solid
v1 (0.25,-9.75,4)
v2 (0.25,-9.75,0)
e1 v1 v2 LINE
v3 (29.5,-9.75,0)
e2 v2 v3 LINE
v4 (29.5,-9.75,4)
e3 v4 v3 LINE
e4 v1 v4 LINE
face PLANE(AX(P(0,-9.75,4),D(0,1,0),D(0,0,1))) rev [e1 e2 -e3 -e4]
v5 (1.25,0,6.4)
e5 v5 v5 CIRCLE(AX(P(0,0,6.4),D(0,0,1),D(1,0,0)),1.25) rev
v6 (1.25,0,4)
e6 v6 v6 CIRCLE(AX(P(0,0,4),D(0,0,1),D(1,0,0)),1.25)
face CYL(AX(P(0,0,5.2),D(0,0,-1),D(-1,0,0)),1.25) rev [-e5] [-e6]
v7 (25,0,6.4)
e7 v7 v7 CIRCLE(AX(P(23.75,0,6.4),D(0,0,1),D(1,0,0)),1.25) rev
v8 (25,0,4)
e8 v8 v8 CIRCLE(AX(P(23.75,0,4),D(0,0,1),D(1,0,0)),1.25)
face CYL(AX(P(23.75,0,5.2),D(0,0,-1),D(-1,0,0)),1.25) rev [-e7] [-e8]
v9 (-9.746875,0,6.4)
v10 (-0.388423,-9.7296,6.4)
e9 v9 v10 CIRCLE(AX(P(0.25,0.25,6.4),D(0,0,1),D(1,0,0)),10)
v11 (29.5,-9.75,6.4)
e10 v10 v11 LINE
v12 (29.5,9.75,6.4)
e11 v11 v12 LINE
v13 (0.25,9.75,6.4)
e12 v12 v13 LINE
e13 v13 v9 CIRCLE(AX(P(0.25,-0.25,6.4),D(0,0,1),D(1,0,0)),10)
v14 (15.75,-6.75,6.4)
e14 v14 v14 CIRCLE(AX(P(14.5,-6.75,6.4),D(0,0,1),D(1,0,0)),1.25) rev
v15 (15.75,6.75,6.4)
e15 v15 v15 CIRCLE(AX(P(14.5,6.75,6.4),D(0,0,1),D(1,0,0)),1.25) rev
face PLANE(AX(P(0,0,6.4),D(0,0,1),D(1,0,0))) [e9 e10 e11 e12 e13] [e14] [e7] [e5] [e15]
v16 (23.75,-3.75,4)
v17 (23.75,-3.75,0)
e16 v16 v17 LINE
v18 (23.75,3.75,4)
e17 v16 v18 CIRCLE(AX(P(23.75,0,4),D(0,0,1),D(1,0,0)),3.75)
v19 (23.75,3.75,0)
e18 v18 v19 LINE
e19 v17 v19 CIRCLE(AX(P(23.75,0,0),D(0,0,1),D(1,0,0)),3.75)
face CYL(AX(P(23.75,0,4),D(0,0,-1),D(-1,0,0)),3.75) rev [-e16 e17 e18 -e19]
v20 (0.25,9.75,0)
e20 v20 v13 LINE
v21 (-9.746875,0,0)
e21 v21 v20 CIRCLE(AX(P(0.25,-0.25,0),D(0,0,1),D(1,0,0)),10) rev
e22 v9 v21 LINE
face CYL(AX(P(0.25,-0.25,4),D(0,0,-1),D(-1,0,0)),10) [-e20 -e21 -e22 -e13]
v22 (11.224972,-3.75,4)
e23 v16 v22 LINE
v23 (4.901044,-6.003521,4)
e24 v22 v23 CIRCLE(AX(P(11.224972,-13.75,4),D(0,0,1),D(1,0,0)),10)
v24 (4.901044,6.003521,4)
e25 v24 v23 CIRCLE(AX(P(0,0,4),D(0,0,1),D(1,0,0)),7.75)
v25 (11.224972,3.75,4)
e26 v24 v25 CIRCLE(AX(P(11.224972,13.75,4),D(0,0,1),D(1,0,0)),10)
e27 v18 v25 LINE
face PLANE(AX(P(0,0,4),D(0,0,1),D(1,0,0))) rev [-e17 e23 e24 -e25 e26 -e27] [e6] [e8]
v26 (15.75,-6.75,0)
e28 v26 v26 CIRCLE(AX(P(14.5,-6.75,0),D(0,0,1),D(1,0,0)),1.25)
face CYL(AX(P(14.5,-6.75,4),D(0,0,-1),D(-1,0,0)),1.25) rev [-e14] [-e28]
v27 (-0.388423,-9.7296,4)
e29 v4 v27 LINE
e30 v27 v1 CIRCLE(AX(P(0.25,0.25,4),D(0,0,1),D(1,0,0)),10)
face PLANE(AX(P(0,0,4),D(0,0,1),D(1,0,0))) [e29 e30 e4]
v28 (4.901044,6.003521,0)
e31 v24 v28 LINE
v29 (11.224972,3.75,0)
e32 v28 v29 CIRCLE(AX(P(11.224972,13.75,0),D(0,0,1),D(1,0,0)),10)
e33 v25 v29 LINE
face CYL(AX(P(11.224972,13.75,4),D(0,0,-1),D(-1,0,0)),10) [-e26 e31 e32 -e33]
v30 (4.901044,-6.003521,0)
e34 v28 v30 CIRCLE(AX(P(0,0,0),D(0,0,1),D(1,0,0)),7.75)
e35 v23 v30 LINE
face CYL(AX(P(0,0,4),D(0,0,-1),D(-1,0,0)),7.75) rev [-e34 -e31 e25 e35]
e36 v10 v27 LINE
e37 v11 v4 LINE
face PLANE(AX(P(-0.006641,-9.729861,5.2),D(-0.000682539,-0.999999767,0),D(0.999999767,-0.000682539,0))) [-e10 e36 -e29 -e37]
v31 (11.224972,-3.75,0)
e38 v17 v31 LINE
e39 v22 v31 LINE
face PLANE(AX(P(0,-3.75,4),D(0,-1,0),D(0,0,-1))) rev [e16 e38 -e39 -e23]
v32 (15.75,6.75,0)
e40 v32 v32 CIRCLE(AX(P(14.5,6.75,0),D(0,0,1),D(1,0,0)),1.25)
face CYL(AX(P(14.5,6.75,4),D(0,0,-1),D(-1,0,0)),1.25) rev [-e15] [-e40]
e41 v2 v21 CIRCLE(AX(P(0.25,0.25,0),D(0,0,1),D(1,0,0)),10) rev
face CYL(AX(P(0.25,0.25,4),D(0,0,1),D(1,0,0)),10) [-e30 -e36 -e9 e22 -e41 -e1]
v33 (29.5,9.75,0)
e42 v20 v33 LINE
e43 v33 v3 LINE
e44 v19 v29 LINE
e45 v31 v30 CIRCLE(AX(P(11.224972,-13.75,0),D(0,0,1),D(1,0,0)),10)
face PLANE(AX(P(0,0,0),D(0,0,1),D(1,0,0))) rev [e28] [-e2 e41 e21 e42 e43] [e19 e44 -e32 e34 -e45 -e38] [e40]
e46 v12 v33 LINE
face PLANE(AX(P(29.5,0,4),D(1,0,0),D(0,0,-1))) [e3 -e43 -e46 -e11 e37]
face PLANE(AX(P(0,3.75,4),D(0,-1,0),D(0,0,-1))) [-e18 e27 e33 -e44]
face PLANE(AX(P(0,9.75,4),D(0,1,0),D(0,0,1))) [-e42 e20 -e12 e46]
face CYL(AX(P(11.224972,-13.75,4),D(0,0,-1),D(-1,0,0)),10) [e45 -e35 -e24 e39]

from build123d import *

# Parameters (mm, degrees)
SKETCH1_R           = 1.25
BOSS_EXTRUDE4_DEPTH = 4
FILLET1_R           = 10
SKETCH2_R           = 1.25
BOSS_EXTRUDE5_DEPTH = 1.2
SKETCH3_R           = 1.25
BOSS_EXTRUDE6_DEPTH = 1.2


with BuildPart() as part:
    # Sketch1 → Boss-Extrude4 (new body)
    with BuildSketch(Plane.XY):
        Polygon((-9.75, 9.75), (-9.75, 0), (-9.75, -9.75), (29.5, -9.75), (29.5, -6.75), (29.5, 6.75), (29.5, 9.75), align=None)
        with Locations((14.5, -6.75)):
            Circle(SKETCH1_R, mode=Mode.SUBTRACT)
        with BuildLine():
            ThreePointArc((4.901044183, -6.003521127), (-3.322604971, -7.001628111), (-7.75, 0))
            ThreePointArc((-7.75, 0), (-3.322604971, 7.001628111), (4.901044183, 6.003521127))
            ThreePointArc((4.901044183, 6.003521127), (7.868246727, 4.330212616), (11.22497216, 3.75))
            Line((11.22497216, 3.75), (23.75, 3.75))
            ThreePointArc((23.75, 3.75), (26.401650429, 2.651650429), (27.5, 0))
            ThreePointArc((27.5, 0), (26.401650429, -2.651650429), (23.75, -3.75))
            Line((23.75, -3.75), (11.22497216, -3.75))
            ThreePointArc((11.22497216, -3.75), (7.868246727, -4.330212616), (4.901044183, -6.003521127))
        make_face(mode=Mode.SUBTRACT)
        with Locations((14.5, 6.75)):
            Circle(SKETCH1_R, mode=Mode.SUBTRACT)
    extrude(amount=BOSS_EXTRUDE4_DEPTH)

    # Fillet1
    # the kernel refuses this fillet: 10 mm, written as the material it takes off along each edge
    with BuildSketch(Plane(origin=(-9.75, -9.75, -25), x_dir=(0, 1, 0), z_dir=(0, 0, 1))) as fillet1_piece_1:
        with BuildLine():
            CenterArc((FILLET1_R, -FILLET1_R), FILLET1_R, 90, 90)
            Line((0, -FILLET1_R), (0, 0))
            Line((0, 0), (FILLET1_R, 0))
        make_face()
    extrude(amount=54, mode=Mode.SUBTRACT)
    with BuildSketch(Plane(origin=(-9.75, 9.75, -25), x_dir=(0, -1, 0), z_dir=(0, 0, 1))) as fillet1_piece_2:
        with BuildLine():
            CenterArc((FILLET1_R, FILLET1_R), FILLET1_R, 180, 90)
            Line((0, FILLET1_R), (0, 0))
            Line((0, 0), (FILLET1_R, 0))
        make_face()
    extrude(amount=54, mode=Mode.SUBTRACT)

    # Sketch2 → Boss-Extrude5 (add)
    # profile 1 of 4: a face of its own
    with BuildSketch(Plane.XY.offset(4)):
        with BuildLine():
            ThreePointArc((8.882472313, 4.028236041), (5.388428188, 8.129565896), (0.25, 9.75))
            ThreePointArc((0.25, 9.75), (-6.732120022, 6.908910532), (-9.746874512, 0))
            ThreePointArc((-9.746874512, 0), (-6.957195545, -6.682267477), (-0.388423062, -9.729599992))
            Line((-0.388423062, -9.729599992), (0.667724562, -9.730320853))
            ThreePointArc((0.667724562, -9.730320853), (5.561475334, -8.012177738), (8.882472313, -4.028236041))
            ThreePointArc((8.882472313, -4.028236041), (6.780629621, -4.791885277), (4.901044183, -6.003521127))
            ThreePointArc((4.901044183, -6.003521127), (-7.75, 0), (4.901044183, 6.003521127))
            ThreePointArc((4.901044183, 6.003521127), (6.780629621, 4.791885277), (8.882472313, 4.028236041))
        make_face()
    # profile 2 of 4: a face of its own
    with BuildSketch(Plane.XY.offset(4)):
        with BuildLine():
            ThreePointArc((9.753204602, 0), (9.5330365, 2.060634631), (8.882472313, 4.028236041))
            ThreePointArc((8.882472313, 4.028236041), (6.780629621, 4.791885277), (4.901044183, 6.003521127))
            ThreePointArc((4.901044183, 6.003521127), (-7.75, 0), (4.901044183, -6.003521127))
            ThreePointArc((4.901044183, -6.003521127), (6.780629621, -4.791885277), (8.882472313, -4.028236041))
            ThreePointArc((8.882472313, -4.028236041), (9.5330365, -2.060634631), (9.753204602, 0))
        make_face()
        Circle(SKETCH2_R, mode=Mode.SUBTRACT)
    # profile 3 of 4: a face of its own
    with BuildSketch(Plane.XY.offset(4)):
        with BuildLine():
            Line((29.5, -9.75), (29.5, 9.75))
            Line((29.5, 9.75), (0.25, 9.75))
            ThreePointArc((0.25, 9.75), (5.388428188, 8.129565896), (8.882472313, 4.028236041))
            ThreePointArc((8.882472313, 4.028236041), (10.045489135, 3.819802631), (11.22497216, 3.75))
            Line((11.22497216, 3.75), (23.75, 3.75))
            ThreePointArc((23.75, 3.75), (27.5, 0), (23.75, -3.75))
            Line((23.75, -3.75), (11.22497216, -3.75))
            ThreePointArc((11.22497216, -3.75), (10.045489135, -3.819802631), (8.882472313, -4.028236041))
            ThreePointArc((8.882472313, -4.028236041), (5.561475334, -8.012177738), (0.667724562, -9.730320853))
            Line((0.667724562, -9.730320853), (29.5, -9.75))
        make_face()
        with Locations((14.5, -6.75)):
            Circle(SKETCH2_R, mode=Mode.SUBTRACT)
        with Locations((14.5, 6.75)):
            Circle(SKETCH2_R, mode=Mode.SUBTRACT)
    # profile 4 of 4: a face of its own
    with BuildSketch(Plane.XY.offset(4)):
        with BuildLine():
            ThreePointArc((11.22497216, 3.75), (10.045489135, 3.819802631), (8.882472313, 4.028236041))
            ThreePointArc((8.882472313, 4.028236041), (9.5330365, 2.060634631), (9.753204602, 0))
            ThreePointArc((9.753204602, 0), (9.5330365, -2.060634631), (8.882472313, -4.028236041))
            ThreePointArc((8.882472313, -4.028236041), (10.045489135, -3.819802631), (11.22497216, -3.75))
            Line((11.22497216, -3.75), (23.75, -3.75))
            ThreePointArc((23.75, -3.75), (27.5, 0), (23.75, 3.75))
            Line((23.75, 3.75), (11.22497216, 3.75))
        make_face()
        with Locations((23.75, 0)):
            Circle(SKETCH2_R, mode=Mode.SUBTRACT)
    extrude(amount=BOSS_EXTRUDE5_DEPTH)

    # Sketch3 → Boss-Extrude6 (add)
    # profile 1 of 2: a face of its own
    with BuildSketch(Plane.XY.offset(5.2)):
        with BuildLine():
            ThreePointArc((9.75, 0), (6.938066581, 6.850235917), (0.124208797, 9.749208797))
            ThreePointArc((0.124208797, 9.749208797), (-6.777009203, 6.864853594), (-9.746874512, 0))
            ThreePointArc((-9.746874512, 0), (-6.957195545, -6.682267477), (-0.388423062, -9.729599992))
            Line((-0.388423062, -9.729599992), (0.619672772, -9.730288056))
            ThreePointArc((0.619672772, -9.730288056), (7.110003851, -6.671607395), (9.75, 0))
        make_face()
        Circle(SKETCH3_R, mode=Mode.SUBTRACT)
    # profile 2 of 2: a face of its own
    with BuildSketch(Plane.XY.offset(5.2)):
        with BuildLine():
            Line((29.5, 9.75), (0.25, 9.75))
            ThreePointArc((0.25, 9.75), (0.187103155, 9.749802197), (0.124208797, 9.749208797))
            ThreePointArc((0.124208797, 9.749208797), (6.938066581, 6.850235917), (9.75, 0))
            ThreePointArc((9.75, 0), (7.110003851, -6.671607395), (0.619672772, -9.730288056))
            Line((0.619672772, -9.730288056), (29.5, -9.75))
            Line((29.5, -9.75), (29.5, 9.75))
        make_face()
        with Locations((14.5, -6.75)):
            Circle(SKETCH3_R, mode=Mode.SUBTRACT)
        with Locations((23.75, 0)):
            Circle(SKETCH3_R, mode=Mode.SUBTRACT)
        with Locations((14.5, 6.75)):
            Circle(SKETCH3_R, mode=Mode.SUBTRACT)
    extrude(amount=BOSS_EXTRUDE6_DEPTH)


solid = part.part
